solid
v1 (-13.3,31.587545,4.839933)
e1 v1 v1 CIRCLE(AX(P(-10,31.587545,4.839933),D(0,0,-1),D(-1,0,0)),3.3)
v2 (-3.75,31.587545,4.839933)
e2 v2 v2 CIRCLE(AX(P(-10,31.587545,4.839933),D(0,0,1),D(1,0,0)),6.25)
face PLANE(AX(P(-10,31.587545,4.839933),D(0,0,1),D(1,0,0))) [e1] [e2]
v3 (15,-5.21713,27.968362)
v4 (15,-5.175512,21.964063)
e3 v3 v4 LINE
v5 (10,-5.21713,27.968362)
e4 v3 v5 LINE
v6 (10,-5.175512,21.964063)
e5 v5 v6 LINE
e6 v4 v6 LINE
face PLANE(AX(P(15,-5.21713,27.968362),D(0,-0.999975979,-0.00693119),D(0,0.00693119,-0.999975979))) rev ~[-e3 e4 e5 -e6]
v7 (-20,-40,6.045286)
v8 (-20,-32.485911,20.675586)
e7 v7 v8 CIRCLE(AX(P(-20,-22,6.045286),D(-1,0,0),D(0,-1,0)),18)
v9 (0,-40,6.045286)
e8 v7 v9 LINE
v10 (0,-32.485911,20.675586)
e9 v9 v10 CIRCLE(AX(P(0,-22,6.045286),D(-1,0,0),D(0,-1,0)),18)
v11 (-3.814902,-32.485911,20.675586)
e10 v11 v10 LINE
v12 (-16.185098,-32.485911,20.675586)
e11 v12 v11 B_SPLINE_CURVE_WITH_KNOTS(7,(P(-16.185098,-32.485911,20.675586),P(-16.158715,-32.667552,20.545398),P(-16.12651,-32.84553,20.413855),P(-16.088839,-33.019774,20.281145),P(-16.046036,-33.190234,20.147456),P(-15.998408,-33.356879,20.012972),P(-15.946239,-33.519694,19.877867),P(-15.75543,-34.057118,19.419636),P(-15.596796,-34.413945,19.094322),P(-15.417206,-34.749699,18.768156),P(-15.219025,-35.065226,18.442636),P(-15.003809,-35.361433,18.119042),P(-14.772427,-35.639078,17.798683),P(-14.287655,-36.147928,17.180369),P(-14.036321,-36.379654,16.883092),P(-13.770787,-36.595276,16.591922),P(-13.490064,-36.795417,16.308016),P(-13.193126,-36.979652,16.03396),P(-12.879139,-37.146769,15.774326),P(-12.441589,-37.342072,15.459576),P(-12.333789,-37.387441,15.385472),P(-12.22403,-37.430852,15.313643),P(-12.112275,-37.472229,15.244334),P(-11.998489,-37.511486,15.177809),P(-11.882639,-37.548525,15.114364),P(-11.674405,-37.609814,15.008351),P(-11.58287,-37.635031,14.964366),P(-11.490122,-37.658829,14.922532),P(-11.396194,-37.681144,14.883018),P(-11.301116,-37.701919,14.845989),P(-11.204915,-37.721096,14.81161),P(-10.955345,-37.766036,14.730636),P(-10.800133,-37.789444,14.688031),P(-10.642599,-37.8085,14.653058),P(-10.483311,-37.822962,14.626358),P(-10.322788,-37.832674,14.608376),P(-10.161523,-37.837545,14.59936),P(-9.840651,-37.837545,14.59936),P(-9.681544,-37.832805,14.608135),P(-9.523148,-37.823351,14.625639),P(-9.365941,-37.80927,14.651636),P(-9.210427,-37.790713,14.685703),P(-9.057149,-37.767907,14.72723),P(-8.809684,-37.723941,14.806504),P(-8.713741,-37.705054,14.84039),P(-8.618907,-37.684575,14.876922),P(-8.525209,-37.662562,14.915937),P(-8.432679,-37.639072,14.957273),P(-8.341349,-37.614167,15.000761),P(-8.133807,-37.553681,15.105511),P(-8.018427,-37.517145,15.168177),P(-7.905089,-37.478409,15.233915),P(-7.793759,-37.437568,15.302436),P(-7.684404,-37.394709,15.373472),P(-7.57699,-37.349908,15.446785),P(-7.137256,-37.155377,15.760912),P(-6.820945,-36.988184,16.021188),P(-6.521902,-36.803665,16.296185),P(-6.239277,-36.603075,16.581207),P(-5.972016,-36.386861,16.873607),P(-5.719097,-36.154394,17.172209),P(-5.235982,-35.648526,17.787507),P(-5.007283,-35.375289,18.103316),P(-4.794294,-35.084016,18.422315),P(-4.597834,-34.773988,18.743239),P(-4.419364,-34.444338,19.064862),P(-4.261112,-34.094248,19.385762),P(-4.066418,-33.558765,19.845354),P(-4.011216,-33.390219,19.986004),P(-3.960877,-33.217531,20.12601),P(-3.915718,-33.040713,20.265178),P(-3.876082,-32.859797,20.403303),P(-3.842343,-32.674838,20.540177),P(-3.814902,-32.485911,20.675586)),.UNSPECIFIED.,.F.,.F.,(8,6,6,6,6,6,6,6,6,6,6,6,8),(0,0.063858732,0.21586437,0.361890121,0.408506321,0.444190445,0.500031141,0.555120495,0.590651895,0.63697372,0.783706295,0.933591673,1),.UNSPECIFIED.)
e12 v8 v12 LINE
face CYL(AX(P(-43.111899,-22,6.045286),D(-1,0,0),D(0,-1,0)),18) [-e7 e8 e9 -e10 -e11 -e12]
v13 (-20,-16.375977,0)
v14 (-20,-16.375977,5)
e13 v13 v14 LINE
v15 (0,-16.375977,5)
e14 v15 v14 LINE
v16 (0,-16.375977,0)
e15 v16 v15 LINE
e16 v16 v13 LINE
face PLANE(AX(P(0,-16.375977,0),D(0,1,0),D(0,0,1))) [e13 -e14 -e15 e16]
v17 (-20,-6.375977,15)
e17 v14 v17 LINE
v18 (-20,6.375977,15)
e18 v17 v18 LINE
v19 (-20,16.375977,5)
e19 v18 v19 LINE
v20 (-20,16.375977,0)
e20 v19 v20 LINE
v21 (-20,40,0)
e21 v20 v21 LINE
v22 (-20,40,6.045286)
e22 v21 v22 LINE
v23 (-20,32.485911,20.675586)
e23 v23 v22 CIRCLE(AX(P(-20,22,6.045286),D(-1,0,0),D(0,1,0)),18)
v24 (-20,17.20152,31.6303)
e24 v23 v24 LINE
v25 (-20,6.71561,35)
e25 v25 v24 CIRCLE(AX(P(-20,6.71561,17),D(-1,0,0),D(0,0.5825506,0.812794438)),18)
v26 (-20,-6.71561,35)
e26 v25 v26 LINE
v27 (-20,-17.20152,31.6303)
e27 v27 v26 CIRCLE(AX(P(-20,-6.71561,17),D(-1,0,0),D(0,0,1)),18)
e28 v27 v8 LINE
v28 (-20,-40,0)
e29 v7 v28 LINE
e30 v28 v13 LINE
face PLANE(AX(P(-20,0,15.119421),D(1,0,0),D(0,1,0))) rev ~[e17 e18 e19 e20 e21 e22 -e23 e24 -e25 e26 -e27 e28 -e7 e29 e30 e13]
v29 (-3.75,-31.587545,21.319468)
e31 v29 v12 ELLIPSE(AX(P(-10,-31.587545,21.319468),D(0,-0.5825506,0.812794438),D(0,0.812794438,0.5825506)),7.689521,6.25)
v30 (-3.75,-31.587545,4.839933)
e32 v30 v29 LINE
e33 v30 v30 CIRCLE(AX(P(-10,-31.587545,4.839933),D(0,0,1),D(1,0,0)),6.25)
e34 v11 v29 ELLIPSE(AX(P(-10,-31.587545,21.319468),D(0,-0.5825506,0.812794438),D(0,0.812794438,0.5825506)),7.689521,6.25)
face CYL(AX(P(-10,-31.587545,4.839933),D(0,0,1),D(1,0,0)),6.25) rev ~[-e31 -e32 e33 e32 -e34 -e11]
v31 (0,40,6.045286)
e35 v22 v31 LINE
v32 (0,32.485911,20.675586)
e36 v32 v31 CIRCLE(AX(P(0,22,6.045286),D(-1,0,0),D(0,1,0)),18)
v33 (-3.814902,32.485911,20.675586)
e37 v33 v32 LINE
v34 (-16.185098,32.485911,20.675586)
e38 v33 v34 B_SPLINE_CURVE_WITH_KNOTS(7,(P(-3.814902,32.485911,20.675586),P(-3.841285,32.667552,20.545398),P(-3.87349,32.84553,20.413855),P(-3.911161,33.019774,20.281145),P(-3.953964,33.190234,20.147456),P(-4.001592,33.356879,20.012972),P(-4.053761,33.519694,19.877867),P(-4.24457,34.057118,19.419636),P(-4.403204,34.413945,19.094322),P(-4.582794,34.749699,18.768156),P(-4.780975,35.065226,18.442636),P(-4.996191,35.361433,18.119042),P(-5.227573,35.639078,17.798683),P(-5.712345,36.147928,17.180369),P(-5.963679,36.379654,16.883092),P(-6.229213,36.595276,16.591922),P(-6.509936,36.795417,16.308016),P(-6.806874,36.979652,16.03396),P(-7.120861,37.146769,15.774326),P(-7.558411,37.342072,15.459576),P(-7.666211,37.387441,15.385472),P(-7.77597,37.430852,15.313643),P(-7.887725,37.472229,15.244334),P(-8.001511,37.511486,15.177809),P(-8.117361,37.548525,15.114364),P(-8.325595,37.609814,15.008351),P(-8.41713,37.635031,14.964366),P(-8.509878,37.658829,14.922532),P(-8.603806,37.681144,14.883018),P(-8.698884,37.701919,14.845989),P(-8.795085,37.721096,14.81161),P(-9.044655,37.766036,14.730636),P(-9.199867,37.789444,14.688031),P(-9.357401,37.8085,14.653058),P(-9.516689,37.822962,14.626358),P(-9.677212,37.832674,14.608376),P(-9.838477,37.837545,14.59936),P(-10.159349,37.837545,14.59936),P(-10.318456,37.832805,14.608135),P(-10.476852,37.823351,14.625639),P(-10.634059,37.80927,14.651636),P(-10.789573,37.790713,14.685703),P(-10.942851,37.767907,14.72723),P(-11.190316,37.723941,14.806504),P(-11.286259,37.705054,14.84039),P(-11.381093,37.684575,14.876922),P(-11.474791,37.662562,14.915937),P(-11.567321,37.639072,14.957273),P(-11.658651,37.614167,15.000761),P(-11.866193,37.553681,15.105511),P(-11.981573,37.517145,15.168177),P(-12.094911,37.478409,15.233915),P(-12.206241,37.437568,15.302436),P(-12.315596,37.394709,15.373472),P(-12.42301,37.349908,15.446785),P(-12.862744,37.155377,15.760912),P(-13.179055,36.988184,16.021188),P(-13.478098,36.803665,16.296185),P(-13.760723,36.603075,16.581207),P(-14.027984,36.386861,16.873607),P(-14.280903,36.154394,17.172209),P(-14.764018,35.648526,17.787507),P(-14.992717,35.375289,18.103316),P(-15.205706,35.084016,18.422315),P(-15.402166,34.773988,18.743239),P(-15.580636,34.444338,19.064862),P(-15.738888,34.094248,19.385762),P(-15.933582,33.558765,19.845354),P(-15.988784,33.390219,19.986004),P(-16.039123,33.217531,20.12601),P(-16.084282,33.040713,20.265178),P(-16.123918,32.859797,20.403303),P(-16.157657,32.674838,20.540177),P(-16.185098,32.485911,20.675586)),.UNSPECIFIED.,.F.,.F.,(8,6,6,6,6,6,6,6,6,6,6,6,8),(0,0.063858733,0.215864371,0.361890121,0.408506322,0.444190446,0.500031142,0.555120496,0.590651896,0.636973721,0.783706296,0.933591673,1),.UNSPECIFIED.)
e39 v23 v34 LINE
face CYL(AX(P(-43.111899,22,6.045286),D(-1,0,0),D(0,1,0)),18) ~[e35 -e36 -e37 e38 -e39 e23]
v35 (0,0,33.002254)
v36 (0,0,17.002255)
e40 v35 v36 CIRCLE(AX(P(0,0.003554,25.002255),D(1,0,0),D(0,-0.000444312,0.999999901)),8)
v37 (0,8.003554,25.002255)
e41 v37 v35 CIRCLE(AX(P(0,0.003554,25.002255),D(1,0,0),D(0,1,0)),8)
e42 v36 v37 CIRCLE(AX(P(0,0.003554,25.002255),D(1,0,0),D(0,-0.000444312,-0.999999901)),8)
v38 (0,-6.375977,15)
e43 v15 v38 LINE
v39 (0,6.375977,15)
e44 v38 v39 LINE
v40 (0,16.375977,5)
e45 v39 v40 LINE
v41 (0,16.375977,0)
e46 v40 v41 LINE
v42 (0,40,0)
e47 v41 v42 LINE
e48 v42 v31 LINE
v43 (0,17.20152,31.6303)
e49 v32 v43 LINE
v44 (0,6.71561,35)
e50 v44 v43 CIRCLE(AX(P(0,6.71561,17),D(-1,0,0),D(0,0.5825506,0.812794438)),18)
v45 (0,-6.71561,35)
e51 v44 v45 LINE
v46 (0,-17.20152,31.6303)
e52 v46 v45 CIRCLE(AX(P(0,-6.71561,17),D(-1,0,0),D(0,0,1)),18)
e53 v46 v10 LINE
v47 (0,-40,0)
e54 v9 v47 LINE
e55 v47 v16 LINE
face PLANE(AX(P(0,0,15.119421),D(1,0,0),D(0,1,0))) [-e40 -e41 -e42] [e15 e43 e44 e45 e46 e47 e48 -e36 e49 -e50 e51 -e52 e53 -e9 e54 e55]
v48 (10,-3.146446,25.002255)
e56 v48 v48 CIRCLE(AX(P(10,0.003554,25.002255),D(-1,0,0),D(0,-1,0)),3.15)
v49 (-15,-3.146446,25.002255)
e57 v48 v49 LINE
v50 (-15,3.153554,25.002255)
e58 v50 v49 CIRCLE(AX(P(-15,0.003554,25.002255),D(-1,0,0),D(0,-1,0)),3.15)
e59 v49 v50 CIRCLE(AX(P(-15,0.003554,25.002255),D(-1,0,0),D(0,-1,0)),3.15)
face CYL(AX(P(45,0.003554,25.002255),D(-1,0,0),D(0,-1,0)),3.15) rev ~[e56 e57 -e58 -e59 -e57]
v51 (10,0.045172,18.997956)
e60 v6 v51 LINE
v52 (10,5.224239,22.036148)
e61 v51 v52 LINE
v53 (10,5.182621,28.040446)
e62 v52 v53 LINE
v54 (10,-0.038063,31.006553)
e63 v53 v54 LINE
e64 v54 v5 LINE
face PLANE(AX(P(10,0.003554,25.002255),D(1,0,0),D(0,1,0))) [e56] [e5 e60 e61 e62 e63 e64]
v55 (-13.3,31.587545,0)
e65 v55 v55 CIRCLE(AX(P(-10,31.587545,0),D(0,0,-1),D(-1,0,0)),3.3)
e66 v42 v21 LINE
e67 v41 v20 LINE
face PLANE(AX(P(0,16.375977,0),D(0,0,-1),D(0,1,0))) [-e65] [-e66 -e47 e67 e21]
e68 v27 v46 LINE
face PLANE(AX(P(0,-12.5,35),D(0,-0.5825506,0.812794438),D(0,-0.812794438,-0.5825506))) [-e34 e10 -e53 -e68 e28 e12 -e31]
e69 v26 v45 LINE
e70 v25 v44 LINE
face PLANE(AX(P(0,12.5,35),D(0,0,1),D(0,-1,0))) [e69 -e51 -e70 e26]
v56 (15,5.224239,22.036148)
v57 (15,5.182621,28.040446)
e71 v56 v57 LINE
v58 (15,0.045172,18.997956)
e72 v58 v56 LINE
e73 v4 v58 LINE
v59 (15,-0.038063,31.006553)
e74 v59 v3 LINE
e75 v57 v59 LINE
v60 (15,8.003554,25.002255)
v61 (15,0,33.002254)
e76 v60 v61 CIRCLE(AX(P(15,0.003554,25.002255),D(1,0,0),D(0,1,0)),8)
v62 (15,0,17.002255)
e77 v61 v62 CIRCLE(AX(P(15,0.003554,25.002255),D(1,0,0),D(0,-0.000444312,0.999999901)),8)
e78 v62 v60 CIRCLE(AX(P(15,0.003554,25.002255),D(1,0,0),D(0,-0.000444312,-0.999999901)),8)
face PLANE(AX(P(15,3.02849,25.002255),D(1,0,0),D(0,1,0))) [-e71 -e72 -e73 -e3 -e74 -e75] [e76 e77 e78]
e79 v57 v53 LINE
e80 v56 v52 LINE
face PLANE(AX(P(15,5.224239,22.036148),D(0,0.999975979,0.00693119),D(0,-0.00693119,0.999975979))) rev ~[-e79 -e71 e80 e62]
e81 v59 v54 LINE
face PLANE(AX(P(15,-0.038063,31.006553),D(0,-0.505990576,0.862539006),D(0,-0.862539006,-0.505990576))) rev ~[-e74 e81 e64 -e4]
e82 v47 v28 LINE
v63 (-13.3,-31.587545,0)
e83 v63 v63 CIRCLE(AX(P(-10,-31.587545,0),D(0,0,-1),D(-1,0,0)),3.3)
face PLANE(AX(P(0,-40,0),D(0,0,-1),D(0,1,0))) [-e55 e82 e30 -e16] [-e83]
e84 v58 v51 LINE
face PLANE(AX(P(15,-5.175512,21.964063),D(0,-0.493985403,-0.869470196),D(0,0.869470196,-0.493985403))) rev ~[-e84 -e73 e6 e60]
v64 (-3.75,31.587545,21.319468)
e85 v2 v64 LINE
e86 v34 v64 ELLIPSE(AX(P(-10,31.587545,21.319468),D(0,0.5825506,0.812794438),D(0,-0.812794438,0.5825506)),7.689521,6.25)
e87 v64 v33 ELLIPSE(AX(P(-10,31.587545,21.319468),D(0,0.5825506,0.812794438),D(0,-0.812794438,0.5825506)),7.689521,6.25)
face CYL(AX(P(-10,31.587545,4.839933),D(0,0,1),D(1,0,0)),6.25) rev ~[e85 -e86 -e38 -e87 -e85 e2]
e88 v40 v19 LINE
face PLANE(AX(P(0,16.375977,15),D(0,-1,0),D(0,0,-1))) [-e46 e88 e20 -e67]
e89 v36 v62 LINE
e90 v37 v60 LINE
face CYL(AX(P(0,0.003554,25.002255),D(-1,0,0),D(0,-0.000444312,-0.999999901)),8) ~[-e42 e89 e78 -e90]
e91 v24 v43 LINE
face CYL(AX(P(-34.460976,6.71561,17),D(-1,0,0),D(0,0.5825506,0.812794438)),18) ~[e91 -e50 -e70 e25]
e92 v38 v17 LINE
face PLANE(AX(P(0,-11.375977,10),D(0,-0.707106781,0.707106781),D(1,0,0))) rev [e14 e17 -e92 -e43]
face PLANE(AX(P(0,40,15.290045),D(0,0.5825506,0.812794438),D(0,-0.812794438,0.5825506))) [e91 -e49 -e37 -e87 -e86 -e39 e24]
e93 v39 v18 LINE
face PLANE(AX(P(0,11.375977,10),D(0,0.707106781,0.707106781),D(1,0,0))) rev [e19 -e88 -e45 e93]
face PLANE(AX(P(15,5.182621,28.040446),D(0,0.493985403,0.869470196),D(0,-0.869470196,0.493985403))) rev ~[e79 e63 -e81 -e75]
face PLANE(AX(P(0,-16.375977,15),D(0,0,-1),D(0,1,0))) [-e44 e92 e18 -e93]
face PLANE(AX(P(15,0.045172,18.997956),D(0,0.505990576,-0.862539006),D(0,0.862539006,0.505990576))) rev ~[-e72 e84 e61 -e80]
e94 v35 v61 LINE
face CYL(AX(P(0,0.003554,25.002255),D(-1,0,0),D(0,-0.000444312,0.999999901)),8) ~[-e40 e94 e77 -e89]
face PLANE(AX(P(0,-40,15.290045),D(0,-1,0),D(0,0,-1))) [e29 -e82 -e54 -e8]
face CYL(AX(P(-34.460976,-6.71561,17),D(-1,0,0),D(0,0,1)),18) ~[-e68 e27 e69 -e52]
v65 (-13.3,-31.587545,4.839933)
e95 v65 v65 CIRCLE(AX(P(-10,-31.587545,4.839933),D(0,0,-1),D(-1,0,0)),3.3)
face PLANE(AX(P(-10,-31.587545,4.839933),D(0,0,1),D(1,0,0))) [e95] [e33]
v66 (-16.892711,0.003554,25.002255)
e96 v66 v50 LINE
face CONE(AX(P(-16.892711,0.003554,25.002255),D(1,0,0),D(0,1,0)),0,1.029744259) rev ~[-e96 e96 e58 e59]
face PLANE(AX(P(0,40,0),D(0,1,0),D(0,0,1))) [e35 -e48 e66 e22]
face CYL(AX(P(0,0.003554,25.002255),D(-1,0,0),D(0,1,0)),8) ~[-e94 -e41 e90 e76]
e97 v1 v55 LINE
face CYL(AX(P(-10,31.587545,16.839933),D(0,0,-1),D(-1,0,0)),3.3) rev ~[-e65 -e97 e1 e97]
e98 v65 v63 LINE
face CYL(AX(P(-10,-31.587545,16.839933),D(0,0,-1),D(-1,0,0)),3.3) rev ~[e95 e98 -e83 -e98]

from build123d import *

# Parameters (mm, degrees)
F1_DEPTH       = 20
F3_DEPTH       = 15
F5_D           = 6.3
F5_DEPTH       = 30
F5_TIP         = 1.8927109499
F6_DEPTH       = 5
F8_D           = 6.6
F8_DEPTH       = 21
F8_START       = 18.1600674
F8_CBORE_D     = 12.5
F8_CBORE_DEPTH = 12
F8_TIP         = 1.9828400428
F9_T1_DEPTH    = 66.2237980807
F9_T3_DEPTH    = 48.9219521717
F10_SIZE       = 10


# Not quite as in the source:
# - a fillet or chamfer that OpenCascade refuses, or shapes differently, is made with other operations: its cross-section is extruded or revolved along the edge and cut away or added


with BuildPart() as f1:
    # F0 (on Right) → F1 (new body)
    with BuildSketch(Plane.YZ):
        Polygon((-16.375976861, 0), (-16.375976861, 10), (-16.375976861, 15), (16.375976861, 15), (16.375976861, 10), (16.375976861, 0), (40, 0), (40, 15.2900453504), (12.5, 35), (0, 35), (-12.5, 35), (-40, 15.2900453504), (-40, 0), align=None)
    extrude(amount=-F1_DEPTH)

    # F2 (on face) → F3 (join)
    with BuildSketch(Plane.YZ):
        with BuildLine():
            ThreePointArc((0, 17.0022554452), (5.6591519034, 19.3441438406), (8.0035544985, 25.0022546555))
            ThreePointArc((8.0035544985, 25.0022546555), (5.6591519034, 30.6603654705), (0, 33.0022538659))
            Line((0, 33.0022538659), (0, 17.0022554452))
        make_face()
        with BuildLine():
            Line((0, 17.0022554452), (0, 33.0022538659))
            ThreePointArc((0, 33.0022538659), (-7.9964455015, 25.0022546555), (0, 17.0022554452))
        make_face()
    extrude(amount=F3_DEPTH)

    # F5
    with Locations(Plane.YZ.offset(15)):
        with Locations((0.0035544985, 25.0022546555)):
            Hole(F5_D / 2, depth=F5_DEPTH)
            with Locations((0, 0, -(F5_DEPTH + F5_TIP / 2))):  # 118° drill point
                Cone(0, F5_D / 2, F5_TIP, mode=Mode.SUBTRACT)

    # F4 (on face) → F6 (cut)
    with BuildSketch(Plane.YZ.offset(15)):
        Polygon((5.1826206219, 28.040446128), (-0.0380634364, 31.0065532225), (-5.2171295598, 27.9683617501), (-5.1755116248, 21.9640631831), (0.0451724335, 18.9979560886), (5.2242385569, 22.036147561), align=None)
    extrude(amount=-F6_DEPTH, mode=Mode.SUBTRACT)

    # F8
    # its depths count from where the whole tool has entered the part; down to there all is cleared
    with Locations(Plane.XY.offset(35).offset(-F8_START)):
        with Locations((-10, 31.5875445392), (-10, -31.5875445392)):
            CounterBoreHole(F8_D / 2, F8_CBORE_D / 2, F8_CBORE_DEPTH, depth=F8_DEPTH)
            with Locations((0, 0, -(F8_DEPTH + F8_TIP / 2))):  # 118° drill point
                Cone(0, F8_D / 2, F8_TIP, mode=Mode.SUBTRACT)

    # F9: fillet of radius 18 on 4 edges, made by hand

    # F9_s2 → F9_t1 (cut)
    with BuildSketch(Plane.YZ.offset(-43.1118990403)):
        with BuildLine():
            ThreePointArc((40, 6.0452857343), (38.0116581667, 14.2688374458), (32.4859108054, 20.6755856144))
            Line((32.4859108054, 20.6755856144), (40, 15.2900453504))
            Line((40, 15.2900453504), (40, 6.0452857343))
        make_face()
        with BuildLine():
            ThreePointArc((-40, 6.0452857343), (-38.0116581667, 14.2688374458), (-32.4859108054, 20.6755856144))
            Line((-32.4859108054, 20.6755856144), (-40, 15.2900453504))
            Line((-40, 15.2900453504), (-40, 6.0452857343))
        make_face()
    extrude(amount=F9_T1_DEPTH, mode=Mode.SUBTRACT)

    # F9_s4 → F9_t3 (cut)
    with BuildSketch(Plane.YZ.offset(-34.4609760859)):
        with BuildLine():
            ThreePointArc((17.201520371, 31.6302998801), (12.2226324527, 34.1368812484), (6.7156095657, 35))
            Line((6.7156095657, 35), (12.5, 35))
            Line((12.5, 35), (17.201520371, 31.6302998801))
        make_face()
        with BuildLine():
            ThreePointArc((-6.7156095657, 35), (-12.2226324527, 34.1368812484), (-17.201520371, 31.6302998801))
            Line((-17.201520371, 31.6302998801), (-12.5, 35))
            Line((-12.5, 35), (-6.7156095657, 35))
        make_face()
    extrude(amount=F9_T3_DEPTH, mode=Mode.SUBTRACT)

    # F10
    f10_edges = [f1.edges().sort_by_distance(p)[0] for p in [
        (-10, 16.375977, 15),
        (-10, -16.375977, 15),
    ]]
    chamfer(f10_edges, length=F10_SIZE)


solid = f1.part
